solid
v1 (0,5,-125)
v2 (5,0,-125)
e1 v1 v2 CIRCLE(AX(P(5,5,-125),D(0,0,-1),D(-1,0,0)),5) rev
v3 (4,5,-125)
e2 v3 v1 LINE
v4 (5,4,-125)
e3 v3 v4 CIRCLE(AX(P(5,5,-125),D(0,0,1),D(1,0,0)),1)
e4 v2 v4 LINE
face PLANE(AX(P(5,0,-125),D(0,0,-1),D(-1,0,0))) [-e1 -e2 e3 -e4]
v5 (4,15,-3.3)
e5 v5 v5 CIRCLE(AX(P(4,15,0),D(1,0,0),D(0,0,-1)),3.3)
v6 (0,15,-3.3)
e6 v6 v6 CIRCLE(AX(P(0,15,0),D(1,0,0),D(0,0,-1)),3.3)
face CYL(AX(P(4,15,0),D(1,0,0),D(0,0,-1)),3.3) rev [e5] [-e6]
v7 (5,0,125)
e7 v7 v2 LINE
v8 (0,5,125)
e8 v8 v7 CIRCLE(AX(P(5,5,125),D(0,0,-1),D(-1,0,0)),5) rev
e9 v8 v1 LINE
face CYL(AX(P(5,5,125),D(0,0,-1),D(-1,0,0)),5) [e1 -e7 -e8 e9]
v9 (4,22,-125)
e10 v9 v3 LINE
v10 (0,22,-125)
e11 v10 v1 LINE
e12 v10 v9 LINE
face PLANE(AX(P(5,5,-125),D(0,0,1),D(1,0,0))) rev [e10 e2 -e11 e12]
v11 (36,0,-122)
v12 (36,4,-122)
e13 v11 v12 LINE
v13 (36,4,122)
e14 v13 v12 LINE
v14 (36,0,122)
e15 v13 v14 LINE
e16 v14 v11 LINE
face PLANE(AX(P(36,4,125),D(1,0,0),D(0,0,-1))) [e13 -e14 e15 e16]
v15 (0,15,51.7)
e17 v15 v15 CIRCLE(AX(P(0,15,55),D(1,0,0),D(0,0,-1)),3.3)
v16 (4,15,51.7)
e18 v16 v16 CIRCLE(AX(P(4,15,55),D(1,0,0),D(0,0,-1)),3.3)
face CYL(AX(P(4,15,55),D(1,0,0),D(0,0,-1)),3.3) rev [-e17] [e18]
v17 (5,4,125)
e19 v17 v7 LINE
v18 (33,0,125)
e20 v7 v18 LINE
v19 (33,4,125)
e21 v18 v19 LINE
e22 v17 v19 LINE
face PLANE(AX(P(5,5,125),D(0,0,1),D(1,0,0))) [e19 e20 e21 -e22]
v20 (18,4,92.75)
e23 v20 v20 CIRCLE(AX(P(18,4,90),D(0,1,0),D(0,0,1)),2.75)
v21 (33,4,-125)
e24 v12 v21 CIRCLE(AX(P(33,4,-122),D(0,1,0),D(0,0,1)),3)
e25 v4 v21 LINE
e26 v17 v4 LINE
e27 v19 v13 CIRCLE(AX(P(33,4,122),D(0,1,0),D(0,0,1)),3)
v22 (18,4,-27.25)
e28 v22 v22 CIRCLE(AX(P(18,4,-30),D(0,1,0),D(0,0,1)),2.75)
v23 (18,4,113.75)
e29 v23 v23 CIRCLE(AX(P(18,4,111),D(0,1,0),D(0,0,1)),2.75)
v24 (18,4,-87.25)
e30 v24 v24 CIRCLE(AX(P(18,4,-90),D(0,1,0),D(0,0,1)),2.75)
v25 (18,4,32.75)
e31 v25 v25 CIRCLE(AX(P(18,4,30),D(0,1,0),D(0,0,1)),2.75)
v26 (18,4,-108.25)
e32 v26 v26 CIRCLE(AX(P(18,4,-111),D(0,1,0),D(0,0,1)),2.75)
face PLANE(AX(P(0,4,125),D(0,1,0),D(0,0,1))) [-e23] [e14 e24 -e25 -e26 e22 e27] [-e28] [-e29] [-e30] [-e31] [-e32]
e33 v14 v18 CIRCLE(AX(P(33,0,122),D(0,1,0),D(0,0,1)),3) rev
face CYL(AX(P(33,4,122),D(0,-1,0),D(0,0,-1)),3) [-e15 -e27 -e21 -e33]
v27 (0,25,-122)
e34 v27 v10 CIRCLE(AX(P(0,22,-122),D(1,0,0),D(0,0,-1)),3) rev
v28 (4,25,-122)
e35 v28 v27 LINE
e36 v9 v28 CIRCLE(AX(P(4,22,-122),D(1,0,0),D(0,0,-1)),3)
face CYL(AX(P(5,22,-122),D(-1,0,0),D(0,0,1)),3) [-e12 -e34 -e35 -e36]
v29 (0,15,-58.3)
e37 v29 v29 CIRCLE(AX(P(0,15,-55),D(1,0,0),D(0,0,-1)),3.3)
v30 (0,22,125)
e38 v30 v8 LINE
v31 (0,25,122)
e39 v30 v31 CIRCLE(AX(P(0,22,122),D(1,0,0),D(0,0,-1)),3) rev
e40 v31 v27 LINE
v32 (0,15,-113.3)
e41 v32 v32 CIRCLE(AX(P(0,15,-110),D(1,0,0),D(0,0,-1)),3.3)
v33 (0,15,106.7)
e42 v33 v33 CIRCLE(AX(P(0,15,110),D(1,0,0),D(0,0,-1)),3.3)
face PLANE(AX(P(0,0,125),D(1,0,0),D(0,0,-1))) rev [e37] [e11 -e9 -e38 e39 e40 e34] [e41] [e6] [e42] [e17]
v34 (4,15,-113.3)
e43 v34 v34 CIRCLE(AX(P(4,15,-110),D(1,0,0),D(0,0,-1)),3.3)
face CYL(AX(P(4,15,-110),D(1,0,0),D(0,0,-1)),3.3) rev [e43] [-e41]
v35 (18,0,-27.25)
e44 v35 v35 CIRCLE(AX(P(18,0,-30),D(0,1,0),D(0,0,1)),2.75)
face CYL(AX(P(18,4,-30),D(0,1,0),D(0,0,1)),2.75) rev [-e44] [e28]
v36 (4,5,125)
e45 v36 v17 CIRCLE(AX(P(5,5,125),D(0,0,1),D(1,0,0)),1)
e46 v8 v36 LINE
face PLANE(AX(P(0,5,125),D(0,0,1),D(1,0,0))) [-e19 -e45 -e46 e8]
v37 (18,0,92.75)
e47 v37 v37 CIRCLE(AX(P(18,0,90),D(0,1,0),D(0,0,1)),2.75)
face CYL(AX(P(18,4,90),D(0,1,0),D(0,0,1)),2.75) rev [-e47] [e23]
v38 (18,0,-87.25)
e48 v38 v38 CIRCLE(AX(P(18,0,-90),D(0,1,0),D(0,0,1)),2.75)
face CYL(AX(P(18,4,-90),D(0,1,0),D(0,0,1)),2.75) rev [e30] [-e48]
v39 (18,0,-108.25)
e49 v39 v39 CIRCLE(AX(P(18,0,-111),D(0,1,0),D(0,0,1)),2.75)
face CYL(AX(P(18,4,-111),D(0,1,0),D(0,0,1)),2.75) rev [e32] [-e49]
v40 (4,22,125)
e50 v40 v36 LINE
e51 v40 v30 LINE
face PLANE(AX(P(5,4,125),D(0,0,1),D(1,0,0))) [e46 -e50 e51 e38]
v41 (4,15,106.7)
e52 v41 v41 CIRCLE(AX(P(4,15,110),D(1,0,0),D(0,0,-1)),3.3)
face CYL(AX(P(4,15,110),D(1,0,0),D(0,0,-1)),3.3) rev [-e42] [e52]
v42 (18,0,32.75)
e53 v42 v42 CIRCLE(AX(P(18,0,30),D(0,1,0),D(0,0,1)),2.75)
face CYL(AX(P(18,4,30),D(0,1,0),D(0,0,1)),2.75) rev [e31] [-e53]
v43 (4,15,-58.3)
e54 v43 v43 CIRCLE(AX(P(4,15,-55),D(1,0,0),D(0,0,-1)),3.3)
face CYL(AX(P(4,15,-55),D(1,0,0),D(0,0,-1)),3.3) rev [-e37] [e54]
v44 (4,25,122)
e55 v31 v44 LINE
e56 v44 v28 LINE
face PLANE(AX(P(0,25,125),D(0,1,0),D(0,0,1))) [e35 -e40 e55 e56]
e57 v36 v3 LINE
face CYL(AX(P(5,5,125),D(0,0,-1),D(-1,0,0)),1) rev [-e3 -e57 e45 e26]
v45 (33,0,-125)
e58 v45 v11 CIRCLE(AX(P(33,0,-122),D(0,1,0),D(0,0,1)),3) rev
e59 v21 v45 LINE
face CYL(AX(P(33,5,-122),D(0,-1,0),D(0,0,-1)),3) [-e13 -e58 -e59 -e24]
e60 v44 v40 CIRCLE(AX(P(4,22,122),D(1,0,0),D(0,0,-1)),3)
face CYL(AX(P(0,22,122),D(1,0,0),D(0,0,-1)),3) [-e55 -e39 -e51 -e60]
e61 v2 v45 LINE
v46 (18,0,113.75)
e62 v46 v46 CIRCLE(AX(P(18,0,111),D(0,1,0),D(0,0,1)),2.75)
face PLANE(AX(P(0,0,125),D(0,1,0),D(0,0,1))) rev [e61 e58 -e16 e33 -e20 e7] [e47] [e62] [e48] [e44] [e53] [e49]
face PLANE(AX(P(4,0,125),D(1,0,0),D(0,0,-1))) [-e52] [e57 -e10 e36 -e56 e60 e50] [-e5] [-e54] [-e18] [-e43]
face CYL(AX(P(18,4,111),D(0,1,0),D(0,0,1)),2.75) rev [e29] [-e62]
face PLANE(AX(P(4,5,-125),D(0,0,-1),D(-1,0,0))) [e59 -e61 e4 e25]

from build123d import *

# Parameters (mm, degrees)
BASE_FLANGE1_START   = -125
BASE_FLANGE1_DEPTH   = 250
FILLET1_R            = 3
M5_CLEARANCE_HOLE1_D = 5.5
M5_CLEARANCE_HOLE2_D = 5.5
M6_CLEARANCE_HOLE1_D = 6.6


# Read off the part's stored shape, not the designer's step: Base-Flange1
with BuildPart() as part:
    # Base-Flange1 outline → Base-Flange1 (new body)
    with BuildSketch(Plane.XY.offset(BASE_FLANGE1_START)):
        with BuildLine():
            Line((5, 0), (36, 0))
            Line((36, 0), (36, 4))
            Line((36, 4), (5, 4))
            ThreePointArc((5, 4), (4.292893219, 4.292893219), (4, 5))
            Line((4, 5), (4, 25))
            Line((4, 25), (0, 25))
            Line((0, 25), (0, 5))
            ThreePointArc((0, 5), (1.464466094, 1.464466094), (5, 0))
        make_face()
    extrude(amount=BASE_FLANGE1_DEPTH)

    # Fillet1
    fillet1_edges = [part.edges().sort_by_distance(p)[0] for p in [
        (2, 25, 125),
        (2, 25, -125),
        (36, 2, 125),
        (36, 2, -125),
    ]]
    fillet(fillet1_edges, radius=FILLET1_R)

    # M5 Clearance Hole1 (through all)
    with Locations(Plane(origin=(0, 4, 0), x_dir=(1, 0, 0), z_dir=(0, 1, 0))):
        with Locations((18, 90), (18, 30), (18, -30), (18, -90)):
            Hole(M5_CLEARANCE_HOLE1_D / 2)

    # M5 Clearance Hole2 (through all)
    with Locations(Plane(origin=(0, 4, 0), x_dir=(1, 0, 0), z_dir=(0, 1, 0))):
        with Locations((18, -111), (18, 111)):
            Hole(M5_CLEARANCE_HOLE2_D / 2)

    # M6 Clearance Hole1 (through all)
    with Locations(Plane(origin=(4, 0, 0), x_dir=(0, 0, -1), z_dir=(1, 0, 0))):
        with Locations((-110, 15), (-55, 15), (0, 15), (55, 15), (110, 15)):
            Hole(M6_CLEARANCE_HOLE1_D / 2)


solid = part.part
